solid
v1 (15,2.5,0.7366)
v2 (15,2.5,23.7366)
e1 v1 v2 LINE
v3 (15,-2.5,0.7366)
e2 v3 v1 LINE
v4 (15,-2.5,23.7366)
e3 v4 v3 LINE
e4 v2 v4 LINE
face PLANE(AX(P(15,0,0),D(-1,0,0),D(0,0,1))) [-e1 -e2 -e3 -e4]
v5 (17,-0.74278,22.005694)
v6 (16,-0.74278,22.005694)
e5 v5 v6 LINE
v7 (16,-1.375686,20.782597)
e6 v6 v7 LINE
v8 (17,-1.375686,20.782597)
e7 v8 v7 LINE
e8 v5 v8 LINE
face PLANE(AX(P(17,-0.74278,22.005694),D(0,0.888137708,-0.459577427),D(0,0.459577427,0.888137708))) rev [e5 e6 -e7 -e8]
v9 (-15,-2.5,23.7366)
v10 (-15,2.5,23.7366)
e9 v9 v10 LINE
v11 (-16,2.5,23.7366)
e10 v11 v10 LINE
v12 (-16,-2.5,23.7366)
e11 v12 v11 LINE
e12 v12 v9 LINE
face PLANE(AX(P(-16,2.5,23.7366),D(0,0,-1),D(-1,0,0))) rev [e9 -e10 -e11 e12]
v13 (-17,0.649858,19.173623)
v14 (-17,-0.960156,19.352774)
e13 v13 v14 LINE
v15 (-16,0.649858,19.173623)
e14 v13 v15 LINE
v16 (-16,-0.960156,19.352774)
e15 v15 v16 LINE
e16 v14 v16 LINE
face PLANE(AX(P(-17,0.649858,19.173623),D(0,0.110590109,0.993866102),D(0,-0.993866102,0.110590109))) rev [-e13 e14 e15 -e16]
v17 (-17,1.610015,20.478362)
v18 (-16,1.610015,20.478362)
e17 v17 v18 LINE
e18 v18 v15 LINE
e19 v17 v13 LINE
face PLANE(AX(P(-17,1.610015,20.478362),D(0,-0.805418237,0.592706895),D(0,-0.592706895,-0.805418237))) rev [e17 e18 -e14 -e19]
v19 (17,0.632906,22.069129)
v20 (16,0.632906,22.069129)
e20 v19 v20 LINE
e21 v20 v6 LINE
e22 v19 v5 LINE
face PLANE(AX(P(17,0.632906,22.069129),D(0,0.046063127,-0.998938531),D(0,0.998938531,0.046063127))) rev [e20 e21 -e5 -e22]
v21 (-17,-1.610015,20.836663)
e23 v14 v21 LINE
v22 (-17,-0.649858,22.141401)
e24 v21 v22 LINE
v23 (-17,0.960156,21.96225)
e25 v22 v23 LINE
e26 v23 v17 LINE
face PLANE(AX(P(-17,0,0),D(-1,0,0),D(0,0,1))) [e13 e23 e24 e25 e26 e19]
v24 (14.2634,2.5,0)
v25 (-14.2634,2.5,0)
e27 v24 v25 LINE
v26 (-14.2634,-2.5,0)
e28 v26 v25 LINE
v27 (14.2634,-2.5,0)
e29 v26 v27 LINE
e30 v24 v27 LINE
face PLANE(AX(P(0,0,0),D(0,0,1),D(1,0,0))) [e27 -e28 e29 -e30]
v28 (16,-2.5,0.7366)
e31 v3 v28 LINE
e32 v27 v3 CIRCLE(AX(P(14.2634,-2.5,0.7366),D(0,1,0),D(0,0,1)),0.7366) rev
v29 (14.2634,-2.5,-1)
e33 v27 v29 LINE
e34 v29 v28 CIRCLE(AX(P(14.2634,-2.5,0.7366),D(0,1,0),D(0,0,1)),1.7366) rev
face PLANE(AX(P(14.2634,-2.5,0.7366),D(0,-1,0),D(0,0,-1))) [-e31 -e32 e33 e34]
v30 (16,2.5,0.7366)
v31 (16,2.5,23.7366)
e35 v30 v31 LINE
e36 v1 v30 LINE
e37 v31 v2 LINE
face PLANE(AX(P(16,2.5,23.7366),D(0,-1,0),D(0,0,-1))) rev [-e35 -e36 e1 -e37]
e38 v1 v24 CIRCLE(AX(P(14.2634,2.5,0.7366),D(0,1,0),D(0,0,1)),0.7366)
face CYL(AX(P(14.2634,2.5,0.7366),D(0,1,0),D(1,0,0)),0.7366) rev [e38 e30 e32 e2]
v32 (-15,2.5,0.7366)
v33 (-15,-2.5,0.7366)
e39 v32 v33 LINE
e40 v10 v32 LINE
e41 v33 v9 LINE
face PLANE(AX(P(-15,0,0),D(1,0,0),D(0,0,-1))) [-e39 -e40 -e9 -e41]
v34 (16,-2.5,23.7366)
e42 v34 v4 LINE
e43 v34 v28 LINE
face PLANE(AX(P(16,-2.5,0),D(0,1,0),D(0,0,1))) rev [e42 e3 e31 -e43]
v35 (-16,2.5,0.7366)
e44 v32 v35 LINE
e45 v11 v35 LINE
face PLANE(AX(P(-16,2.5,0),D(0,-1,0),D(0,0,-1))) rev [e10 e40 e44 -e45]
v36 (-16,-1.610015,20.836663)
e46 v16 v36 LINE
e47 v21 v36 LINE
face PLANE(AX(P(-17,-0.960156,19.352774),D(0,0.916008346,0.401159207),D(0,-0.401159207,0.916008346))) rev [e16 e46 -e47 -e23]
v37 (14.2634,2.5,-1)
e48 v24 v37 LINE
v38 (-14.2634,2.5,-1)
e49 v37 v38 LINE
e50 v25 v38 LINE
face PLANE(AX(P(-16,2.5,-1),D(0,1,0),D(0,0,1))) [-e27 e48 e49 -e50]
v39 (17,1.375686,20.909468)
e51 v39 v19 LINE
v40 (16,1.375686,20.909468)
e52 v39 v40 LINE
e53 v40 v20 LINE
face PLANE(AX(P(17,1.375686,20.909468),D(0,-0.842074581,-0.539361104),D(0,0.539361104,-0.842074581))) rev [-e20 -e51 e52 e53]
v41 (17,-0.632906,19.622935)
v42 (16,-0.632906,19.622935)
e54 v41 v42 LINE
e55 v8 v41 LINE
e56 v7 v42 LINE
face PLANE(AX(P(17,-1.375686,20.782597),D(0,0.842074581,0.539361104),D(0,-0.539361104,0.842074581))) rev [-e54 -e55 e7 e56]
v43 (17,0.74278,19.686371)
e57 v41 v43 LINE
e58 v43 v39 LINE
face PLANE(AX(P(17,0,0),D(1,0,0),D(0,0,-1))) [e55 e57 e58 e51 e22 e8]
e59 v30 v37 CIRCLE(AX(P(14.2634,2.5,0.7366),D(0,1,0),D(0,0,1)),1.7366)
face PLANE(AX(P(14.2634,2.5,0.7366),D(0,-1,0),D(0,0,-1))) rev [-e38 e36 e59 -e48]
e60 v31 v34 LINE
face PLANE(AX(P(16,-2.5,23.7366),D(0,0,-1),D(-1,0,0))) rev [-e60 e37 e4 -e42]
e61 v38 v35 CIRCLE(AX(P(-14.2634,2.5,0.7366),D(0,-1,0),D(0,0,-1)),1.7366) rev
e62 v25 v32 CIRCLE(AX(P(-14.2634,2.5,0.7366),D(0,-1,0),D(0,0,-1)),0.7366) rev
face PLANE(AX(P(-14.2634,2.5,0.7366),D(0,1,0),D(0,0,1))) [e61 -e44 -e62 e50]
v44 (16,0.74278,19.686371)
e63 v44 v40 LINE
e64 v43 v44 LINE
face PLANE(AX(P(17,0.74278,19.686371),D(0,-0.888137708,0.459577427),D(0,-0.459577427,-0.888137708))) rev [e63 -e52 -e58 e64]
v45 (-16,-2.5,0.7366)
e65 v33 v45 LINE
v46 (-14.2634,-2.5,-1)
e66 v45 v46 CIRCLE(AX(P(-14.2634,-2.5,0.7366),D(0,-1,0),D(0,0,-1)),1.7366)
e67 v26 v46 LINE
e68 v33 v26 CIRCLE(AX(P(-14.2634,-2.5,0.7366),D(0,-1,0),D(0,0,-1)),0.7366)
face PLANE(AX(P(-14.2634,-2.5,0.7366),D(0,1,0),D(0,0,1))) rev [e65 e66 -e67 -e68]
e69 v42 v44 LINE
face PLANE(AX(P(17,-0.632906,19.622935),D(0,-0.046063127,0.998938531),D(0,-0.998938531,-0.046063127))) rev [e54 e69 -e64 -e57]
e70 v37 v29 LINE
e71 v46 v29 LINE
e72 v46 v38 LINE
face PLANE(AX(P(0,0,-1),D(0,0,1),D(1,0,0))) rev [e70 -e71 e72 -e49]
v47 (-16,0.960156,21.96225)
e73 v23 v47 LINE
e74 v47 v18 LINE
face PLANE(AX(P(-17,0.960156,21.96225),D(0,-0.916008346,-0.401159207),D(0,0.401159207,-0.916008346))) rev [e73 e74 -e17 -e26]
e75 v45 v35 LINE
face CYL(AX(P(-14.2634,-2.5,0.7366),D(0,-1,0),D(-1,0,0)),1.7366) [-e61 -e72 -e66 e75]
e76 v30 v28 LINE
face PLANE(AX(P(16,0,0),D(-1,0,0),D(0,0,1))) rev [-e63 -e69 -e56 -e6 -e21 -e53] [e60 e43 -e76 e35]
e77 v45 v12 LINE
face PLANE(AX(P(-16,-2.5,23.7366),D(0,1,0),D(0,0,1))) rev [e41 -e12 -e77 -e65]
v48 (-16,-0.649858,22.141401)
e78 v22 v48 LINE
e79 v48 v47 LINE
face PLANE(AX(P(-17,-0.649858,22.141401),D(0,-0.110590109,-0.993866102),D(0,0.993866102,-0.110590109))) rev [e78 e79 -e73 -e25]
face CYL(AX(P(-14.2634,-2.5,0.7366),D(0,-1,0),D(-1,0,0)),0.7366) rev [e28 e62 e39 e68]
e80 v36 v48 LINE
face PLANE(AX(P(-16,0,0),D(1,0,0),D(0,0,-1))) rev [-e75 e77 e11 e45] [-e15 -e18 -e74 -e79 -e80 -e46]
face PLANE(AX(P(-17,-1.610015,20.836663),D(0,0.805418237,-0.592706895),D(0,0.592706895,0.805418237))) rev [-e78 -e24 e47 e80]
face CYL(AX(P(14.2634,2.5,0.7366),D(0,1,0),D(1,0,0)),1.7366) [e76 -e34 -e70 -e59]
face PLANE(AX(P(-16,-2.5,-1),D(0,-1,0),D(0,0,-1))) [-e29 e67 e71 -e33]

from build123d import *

# Parameters (mm, degrees)
SKETCH1_W                      = 32
SKETCH1_H                      = 5
BASE_FLANGE1_DEPTH             = 1
EDGE_FLANGE1_STRIP_W           = 5.4732
EDGE_FLANGE1_STRIP_H           = 1
EDGE_FLANGE1_STRIP_CUT_DEPTH   = 5
EDGE_FLANGE1_STRIP_2_W         = 5.4732
EDGE_FLANGE1_STRIP_2_H         = 1
EDGE_FLANGE1_STRIP_CUT_2_DEPTH = 5
EDGE_FLANGE1_DEPTH             = 5
EDGE_FLANGE1_BEND_DEPTH        = 5
BOSS_EXTRUDE1_DEPTH            = 1
BOSS_EXTRUDE2_DEPTH            = 1


# Sheet-metal steps are written as plain solids
with BuildPart() as part:
    # Sketch1 → Base-Flange1 (new body)
    with BuildSketch(Plane.XY):
        Rectangle(SKETCH1_W, SKETCH1_H)
    extrude(amount=-BASE_FLANGE1_DEPTH)

    # Edge-Flange1 strip (across the edge) → Edge-Flange1 strip cut (cut)
    with BuildSketch(Plane(origin=(-16, 2.5, 0), x_dir=(1, 0, 0), z_dir=(0, -1, 0))):
        with Locations((-1, -0.5)):
            Rectangle(EDGE_FLANGE1_STRIP_W, EDGE_FLANGE1_STRIP_H)
    extrude(amount=EDGE_FLANGE1_STRIP_CUT_DEPTH, mode=Mode.SUBTRACT)

    # Edge-Flange1 strip 2 (across the edge) → Edge-Flange1 strip cut 2 (cut)
    with BuildSketch(Plane(origin=(16, -2.5, 0), x_dir=(-1, 0, 0), z_dir=(0, 1, 0))):
        with Locations((-1, -0.5)):
            Rectangle(EDGE_FLANGE1_STRIP_2_W, EDGE_FLANGE1_STRIP_2_H)
    extrude(amount=EDGE_FLANGE1_STRIP_CUT_2_DEPTH, mode=Mode.SUBTRACT)

    # Edge-Flange1 section (across the edge) → Edge-Flange1 (add)
    with BuildSketch(Plane(origin=(-16, 2.5, 0), x_dir=(1, 0, 0), z_dir=(0, -1, 0))):
        with BuildLine():
            Line((0, 0.7366), (0, 23.7366))
            Line((0, 23.7366), (1, 23.7366))
            Line((1, 23.7366), (1, 0.7366))
            ThreePointArc((1, 0.7366), (1.215745145, 0.215745145), (1.7366, 0))
            Line((1.7366, 0), (1.7366, -1))
            ThreePointArc((1.7366, -1), (0.508638364, -0.491361636), (0, 0.7366))
        make_face()
    extrude(amount=EDGE_FLANGE1_DEPTH)

    # Edge-Flange1 section 2 (across the edge) → Edge-Flange1 bend (add)
    with BuildSketch(Plane(origin=(16, -2.5, 0), x_dir=(-1, 0, 0), z_dir=(0, 1, 0))):
        with BuildLine():
            Line((0, 0.7366), (0, 23.7366))
            Line((0, 23.7366), (1, 23.7366))
            Line((1, 23.7366), (1, 0.7366))
            ThreePointArc((1, 0.7366), (1.215745145, 0.215745145), (1.7366, 0))
            Line((1.7366, 0), (1.7366, -1))
            ThreePointArc((1.7366, -1), (0.508638364, -0.491361636), (0, 0.7366))
        make_face()
    extrude(amount=EDGE_FLANGE1_BEND_DEPTH)

    # Sketch12 → Boss-Extrude1 (add)
    with BuildSketch(Plane(origin=(16, 0, 0), x_dir=(0, 0, -1), z_dir=(1, 0, 0))):
        Polygon((-19.622935429, -0.632906062), (-19.686371165, 0.74277998), (-20.909468094, 1.375686043), (-22.069129286, 0.632906062), (-22.00569355, -0.74277998), (-20.782596622, -1.375686043), align=None)
    extrude(amount=BOSS_EXTRUDE1_DEPTH)

    # Sketch13 → Boss-Extrude2 (add)
    with BuildSketch(Plane.ZY.offset(16)):
        Polygon((22.141401041, -0.649858365), (21.962250454, 0.960156284), (20.478361573, 1.61001465), (19.17362328, 0.649858365), (19.352773867, -0.960156284), (20.836662748, -1.61001465), align=None)
    extrude(amount=BOSS_EXTRUDE2_DEPTH)


solid = part.part
